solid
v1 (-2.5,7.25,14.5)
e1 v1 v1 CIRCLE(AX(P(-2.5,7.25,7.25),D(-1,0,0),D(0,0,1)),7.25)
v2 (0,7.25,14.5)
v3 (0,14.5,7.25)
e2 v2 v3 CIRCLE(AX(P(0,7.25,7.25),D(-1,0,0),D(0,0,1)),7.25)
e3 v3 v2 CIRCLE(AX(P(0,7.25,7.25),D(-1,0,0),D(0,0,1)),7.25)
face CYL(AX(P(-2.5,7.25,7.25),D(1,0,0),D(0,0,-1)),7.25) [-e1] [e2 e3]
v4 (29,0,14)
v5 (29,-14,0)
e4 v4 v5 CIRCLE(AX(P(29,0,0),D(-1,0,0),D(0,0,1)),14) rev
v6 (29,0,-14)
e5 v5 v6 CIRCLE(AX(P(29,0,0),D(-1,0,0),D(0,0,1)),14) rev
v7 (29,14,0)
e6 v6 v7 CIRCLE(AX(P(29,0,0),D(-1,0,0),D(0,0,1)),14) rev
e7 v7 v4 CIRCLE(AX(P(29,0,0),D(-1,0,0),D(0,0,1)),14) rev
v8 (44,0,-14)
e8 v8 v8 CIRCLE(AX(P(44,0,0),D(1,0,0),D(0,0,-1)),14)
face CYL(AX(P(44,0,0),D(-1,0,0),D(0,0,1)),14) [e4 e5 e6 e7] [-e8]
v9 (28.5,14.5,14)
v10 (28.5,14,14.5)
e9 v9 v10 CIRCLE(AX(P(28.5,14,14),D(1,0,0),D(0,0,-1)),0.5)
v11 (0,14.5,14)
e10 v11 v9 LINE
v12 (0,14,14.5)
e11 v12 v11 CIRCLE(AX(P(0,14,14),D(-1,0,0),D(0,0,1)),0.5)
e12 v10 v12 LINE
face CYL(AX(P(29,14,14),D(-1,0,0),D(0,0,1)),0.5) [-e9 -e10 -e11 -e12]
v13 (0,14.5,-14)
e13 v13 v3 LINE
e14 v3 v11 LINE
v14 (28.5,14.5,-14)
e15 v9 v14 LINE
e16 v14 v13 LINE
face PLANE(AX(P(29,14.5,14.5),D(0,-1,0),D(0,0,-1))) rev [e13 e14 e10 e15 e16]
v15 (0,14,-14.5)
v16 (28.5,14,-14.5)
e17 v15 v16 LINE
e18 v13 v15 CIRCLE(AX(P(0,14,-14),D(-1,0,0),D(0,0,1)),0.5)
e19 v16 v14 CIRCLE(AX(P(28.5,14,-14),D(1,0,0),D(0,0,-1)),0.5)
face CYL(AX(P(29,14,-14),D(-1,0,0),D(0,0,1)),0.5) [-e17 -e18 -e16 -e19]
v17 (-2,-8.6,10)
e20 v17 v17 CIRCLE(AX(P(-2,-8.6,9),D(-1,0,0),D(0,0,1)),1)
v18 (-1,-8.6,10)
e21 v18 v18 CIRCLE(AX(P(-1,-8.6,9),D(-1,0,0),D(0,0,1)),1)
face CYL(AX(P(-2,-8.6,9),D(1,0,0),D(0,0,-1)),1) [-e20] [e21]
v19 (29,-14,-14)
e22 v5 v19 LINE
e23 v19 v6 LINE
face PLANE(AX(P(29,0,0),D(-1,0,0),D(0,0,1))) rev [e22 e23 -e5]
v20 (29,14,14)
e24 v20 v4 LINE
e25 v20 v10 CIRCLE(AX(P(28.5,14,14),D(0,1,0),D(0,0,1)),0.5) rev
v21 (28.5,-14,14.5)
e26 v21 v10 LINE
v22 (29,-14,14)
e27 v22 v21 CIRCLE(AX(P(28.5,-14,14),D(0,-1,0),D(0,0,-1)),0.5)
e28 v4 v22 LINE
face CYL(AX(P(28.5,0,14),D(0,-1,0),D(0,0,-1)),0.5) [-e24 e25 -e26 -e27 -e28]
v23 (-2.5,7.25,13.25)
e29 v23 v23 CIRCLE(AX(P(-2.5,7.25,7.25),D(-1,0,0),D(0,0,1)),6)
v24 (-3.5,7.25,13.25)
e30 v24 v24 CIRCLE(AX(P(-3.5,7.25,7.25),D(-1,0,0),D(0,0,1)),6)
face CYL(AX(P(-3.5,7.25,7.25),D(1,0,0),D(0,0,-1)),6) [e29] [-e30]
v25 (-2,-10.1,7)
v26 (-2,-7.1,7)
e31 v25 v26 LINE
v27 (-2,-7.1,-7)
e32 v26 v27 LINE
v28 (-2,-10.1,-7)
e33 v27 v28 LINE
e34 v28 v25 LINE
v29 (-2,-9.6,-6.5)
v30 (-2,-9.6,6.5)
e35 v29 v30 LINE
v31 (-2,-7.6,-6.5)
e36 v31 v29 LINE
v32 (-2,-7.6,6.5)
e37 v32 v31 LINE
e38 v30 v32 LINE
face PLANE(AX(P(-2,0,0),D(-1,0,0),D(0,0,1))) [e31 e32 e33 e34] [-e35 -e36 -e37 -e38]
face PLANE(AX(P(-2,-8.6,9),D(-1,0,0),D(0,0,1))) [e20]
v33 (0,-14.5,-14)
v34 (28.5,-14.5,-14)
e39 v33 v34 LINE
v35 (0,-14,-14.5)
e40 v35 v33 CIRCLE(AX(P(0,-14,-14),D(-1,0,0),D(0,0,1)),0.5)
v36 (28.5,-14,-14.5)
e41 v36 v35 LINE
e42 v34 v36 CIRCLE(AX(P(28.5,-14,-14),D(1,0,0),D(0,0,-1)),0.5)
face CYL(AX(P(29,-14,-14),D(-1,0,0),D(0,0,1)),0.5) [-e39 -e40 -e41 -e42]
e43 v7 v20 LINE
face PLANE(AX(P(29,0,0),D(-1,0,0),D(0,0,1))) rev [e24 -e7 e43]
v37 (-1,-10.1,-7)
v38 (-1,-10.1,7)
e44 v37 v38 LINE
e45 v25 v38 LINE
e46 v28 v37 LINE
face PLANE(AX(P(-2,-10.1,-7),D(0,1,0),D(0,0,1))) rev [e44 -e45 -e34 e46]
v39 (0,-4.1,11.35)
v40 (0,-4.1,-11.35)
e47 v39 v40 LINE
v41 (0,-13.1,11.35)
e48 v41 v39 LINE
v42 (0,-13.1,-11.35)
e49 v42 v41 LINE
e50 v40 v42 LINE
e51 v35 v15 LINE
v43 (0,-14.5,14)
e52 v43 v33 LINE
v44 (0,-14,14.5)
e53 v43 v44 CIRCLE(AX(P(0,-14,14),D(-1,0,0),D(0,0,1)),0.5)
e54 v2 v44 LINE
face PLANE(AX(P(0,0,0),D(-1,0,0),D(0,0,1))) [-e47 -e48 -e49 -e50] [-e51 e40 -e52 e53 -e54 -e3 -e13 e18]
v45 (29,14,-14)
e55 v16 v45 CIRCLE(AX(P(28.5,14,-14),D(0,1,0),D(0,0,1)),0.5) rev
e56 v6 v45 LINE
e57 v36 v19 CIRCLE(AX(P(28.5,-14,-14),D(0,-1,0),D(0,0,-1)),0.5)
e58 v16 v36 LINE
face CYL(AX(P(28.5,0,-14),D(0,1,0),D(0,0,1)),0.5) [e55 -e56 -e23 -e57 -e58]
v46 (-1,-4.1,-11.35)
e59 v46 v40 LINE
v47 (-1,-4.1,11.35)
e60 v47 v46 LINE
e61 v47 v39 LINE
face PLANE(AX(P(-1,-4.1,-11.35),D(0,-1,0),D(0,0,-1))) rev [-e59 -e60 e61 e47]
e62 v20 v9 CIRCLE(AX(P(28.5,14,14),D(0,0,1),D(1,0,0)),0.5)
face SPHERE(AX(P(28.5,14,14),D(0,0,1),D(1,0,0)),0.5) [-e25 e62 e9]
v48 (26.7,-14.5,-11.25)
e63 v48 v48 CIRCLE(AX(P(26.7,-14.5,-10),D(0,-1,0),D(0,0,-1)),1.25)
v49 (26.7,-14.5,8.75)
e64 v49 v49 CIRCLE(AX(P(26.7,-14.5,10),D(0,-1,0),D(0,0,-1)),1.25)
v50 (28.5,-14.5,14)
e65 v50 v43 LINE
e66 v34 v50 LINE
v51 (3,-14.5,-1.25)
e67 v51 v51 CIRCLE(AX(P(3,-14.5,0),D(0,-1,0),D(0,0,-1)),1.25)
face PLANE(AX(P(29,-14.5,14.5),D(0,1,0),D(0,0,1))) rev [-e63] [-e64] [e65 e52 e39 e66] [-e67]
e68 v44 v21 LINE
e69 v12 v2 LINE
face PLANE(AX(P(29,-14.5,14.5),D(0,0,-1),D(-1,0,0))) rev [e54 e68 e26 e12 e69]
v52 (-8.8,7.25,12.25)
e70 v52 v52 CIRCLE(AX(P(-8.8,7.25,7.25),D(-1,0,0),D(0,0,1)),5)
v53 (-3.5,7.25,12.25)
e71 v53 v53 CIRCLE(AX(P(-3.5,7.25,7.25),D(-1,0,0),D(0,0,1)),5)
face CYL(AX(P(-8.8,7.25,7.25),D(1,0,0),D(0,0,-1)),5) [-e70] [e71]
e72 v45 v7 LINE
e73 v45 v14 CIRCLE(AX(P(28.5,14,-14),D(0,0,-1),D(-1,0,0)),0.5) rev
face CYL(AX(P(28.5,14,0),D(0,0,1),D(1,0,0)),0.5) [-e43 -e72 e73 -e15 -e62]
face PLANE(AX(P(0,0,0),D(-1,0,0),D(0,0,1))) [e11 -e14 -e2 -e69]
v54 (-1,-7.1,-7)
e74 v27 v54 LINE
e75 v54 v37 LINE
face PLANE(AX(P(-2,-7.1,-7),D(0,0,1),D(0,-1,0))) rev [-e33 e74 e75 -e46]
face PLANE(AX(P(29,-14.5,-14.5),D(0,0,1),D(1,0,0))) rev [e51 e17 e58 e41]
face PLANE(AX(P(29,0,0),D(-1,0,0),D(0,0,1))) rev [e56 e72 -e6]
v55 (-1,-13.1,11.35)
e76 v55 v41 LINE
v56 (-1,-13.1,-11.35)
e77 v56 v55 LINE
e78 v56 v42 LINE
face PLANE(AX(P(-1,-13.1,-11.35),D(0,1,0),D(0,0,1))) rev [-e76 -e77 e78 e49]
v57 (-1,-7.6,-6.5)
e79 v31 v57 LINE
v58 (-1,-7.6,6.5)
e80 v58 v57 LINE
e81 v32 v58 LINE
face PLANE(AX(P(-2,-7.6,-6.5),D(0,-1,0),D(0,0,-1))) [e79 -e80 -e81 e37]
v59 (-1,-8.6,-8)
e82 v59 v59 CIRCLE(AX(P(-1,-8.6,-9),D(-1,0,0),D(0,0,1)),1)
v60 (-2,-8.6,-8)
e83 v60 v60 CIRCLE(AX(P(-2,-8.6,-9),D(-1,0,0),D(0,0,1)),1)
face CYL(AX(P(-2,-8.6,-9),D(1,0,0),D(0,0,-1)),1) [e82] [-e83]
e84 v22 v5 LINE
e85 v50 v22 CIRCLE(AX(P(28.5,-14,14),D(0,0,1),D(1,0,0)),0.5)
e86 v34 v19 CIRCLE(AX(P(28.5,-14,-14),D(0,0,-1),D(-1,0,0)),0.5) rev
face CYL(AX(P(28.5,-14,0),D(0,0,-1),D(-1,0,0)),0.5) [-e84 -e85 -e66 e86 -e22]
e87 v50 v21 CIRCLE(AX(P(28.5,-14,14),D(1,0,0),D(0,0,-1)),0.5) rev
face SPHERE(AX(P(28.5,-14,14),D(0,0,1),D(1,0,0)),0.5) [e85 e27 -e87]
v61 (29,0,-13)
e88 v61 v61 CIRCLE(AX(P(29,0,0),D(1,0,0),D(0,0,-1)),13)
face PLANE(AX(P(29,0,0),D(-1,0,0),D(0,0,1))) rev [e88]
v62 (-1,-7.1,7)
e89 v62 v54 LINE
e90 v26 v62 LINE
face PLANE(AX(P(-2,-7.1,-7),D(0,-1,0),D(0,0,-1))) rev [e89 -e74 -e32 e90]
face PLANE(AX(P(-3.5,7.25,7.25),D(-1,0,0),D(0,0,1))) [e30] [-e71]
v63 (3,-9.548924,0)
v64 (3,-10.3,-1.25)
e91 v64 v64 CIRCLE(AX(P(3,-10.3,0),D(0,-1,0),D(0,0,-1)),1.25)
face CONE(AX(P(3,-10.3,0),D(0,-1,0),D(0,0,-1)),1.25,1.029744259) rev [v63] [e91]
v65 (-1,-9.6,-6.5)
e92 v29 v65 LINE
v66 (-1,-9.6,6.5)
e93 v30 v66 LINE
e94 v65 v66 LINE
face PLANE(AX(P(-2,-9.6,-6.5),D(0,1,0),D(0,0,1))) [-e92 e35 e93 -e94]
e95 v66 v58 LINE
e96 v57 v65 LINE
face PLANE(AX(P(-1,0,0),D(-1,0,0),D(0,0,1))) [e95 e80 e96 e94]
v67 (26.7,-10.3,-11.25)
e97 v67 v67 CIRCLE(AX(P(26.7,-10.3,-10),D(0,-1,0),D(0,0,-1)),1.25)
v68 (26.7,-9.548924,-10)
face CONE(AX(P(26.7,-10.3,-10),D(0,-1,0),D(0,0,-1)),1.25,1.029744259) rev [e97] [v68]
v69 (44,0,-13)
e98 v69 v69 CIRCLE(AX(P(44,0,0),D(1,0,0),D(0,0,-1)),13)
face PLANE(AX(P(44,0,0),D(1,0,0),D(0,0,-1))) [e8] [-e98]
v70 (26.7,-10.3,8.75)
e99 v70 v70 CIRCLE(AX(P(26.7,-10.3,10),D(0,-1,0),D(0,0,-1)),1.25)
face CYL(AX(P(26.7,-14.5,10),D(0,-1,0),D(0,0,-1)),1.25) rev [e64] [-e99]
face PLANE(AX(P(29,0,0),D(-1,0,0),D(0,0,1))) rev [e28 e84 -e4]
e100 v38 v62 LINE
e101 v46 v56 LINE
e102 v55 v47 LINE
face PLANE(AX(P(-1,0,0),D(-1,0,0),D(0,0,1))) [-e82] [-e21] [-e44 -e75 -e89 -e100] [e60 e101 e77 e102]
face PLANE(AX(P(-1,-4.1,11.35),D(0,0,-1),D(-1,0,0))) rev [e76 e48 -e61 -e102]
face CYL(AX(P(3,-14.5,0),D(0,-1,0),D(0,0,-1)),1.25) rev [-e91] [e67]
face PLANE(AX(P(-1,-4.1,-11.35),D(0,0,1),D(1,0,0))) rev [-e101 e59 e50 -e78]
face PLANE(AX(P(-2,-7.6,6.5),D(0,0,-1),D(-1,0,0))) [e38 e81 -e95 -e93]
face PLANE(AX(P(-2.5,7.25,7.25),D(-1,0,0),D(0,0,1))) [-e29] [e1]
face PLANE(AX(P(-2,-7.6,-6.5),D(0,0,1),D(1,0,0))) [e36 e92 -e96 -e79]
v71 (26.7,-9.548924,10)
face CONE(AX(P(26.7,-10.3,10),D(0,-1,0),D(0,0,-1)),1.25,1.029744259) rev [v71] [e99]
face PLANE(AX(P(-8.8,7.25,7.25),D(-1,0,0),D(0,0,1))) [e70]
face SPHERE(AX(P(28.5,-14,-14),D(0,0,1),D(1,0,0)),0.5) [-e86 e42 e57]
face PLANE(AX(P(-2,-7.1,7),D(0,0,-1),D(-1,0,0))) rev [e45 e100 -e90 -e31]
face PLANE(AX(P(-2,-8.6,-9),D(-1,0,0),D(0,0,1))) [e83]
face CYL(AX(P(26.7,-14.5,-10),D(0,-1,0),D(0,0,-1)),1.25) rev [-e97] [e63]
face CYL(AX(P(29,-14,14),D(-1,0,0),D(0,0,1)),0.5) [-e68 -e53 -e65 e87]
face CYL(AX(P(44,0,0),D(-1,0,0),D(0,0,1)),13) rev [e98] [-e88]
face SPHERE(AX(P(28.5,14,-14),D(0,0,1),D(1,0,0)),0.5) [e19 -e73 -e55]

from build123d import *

# Parameters (mm, degrees)
SKETCH_1_W             = 29
SKETCH_1_H             = 29
EXTRUDE_1_DEPTH        = 29
SKETCH_3_W             = 22.7
SKETCH_3_H             = 9
EXTRUDE_3_DEPTH        = 1
SKETCH_4_R             = 1
SKETCH_4_W             = 14
SKETCH_4_H             = 3
SKETCH_4_W_2           = 13
SKETCH_4_H_2           = 2
EXTRUDE_4_DEPTH        = 1
SKETCH_5_R             = 7.25
EXTRUDE_5_DEPTH        = 2.5
SKETCH_6_R             = 6
EXTRUDE_6_DEPTH        = 1
SKETCH_7_R             = 5
EXTRUDE_7_DEPTH        = 5.3
SKETCH_8_R             = 14
SKETCH_8_R_2           = 13
EXTRUDE_8_DEPTH        = 15
HOLE_WIZARD_M3_1_D     = 2.5
HOLE_WIZARD_M3_1_DEPTH = 4.2
HOLE_WIZARD_M3_1_TIP   = 0.751075774
FILLET_1_R             = 0.5


with BuildPart() as part:
    # 草图1 → 凸台-拉伸1 (new body)
    with BuildSketch(Plane(origin=(0, 0, 0), x_dir=(0, 0, -1), z_dir=(1, 0, 0))):
        Rectangle(SKETCH_1_W, SKETCH_1_H)
    extrude(amount=EXTRUDE_1_DEPTH)

    # 草图3 → 凸台-拉伸3 (add)
    with BuildSketch(Plane.ZY):
        with Locations((0, -8.6)):
            Rectangle(SKETCH_3_W, SKETCH_3_H)
    extrude(amount=EXTRUDE_3_DEPTH)

    # 草图4 → 凸台-拉伸4 (add)
    # profile 1 of 3: a face of its own
    with BuildSketch(Plane.ZY.offset(1)):
        with Locations((-9, -8.6)):
            Circle(SKETCH_4_R)
    # profile 2 of 3: a face of its own
    with BuildSketch(Plane.ZY.offset(1)):
        with Locations((9, -8.6)):
            Circle(SKETCH_4_R)
    # profile 3 of 3: a face of its own
    with BuildSketch(Plane.ZY.offset(1)):
        with Locations((0, -8.6)):
            Rectangle(SKETCH_4_W, SKETCH_4_H)
        with Locations((0, -8.6)):
            Rectangle(SKETCH_4_W_2, SKETCH_4_H_2, mode=Mode.SUBTRACT)
    extrude(amount=EXTRUDE_4_DEPTH)

    # 草图5 → 凸台-拉伸5 (add)
    with BuildSketch(Plane.ZY):
        with Locations((7.25, 7.25)):
            Circle(SKETCH_5_R)
    extrude(amount=EXTRUDE_5_DEPTH)

    # 草图6 → 凸台-拉伸6 (add)
    with BuildSketch(Plane.ZY.offset(2.5)):
        with Locations((7.25, 7.25)):
            Circle(SKETCH_6_R)
    extrude(amount=EXTRUDE_6_DEPTH)

    # 草图7 → 凸台-拉伸7 (add)
    with BuildSketch(Plane.ZY.offset(3.5)):
        with Locations((7.25, 7.25)):
            Circle(SKETCH_7_R)
    extrude(amount=EXTRUDE_7_DEPTH)

    # 草图8 → 凸台-拉伸8 (add)
    with BuildSketch(Plane(origin=(29, 0, 0), x_dir=(0, 0, -1), z_dir=(1, 0, 0))):
        with Locations(Location((0, 0, 0), (0, 0, 180))):
            Circle(SKETCH_8_R)
        Circle(SKETCH_8_R_2, mode=Mode.SUBTRACT)
    extrude(amount=EXTRUDE_8_DEPTH)

    # M3 螺纹孔1
    with Locations(Plane(origin=(0, -14.5, 0), x_dir=(-1, 0, 0), z_dir=(0, -1, 0))):
        with Locations((-26.7, 10), (-26.7, -10), (-3, 0)):
            Hole(HOLE_WIZARD_M3_1_D / 2, depth=HOLE_WIZARD_M3_1_DEPTH)
            with Locations((0, 0, -(HOLE_WIZARD_M3_1_DEPTH + HOLE_WIZARD_M3_1_TIP / 2))):  # 118° drill point
                Cone(0, HOLE_WIZARD_M3_1_D / 2, HOLE_WIZARD_M3_1_TIP, mode=Mode.SUBTRACT)

    # 圆角1
    fillet_1_edges = [part.edges().sort_by_distance(p)[0] for p in [
        (29, 0, 14.5),
        (29, -14.5, 0),
        (29, 0, -14.5),
        (29, 14.5, 0),
        (14.5, -14.5, -14.5),
        (14.5, -14.5, 14.5),
        (14.5, 14.5, 14.5),
        (14.5, 14.5, -14.5),
    ]]
    fillet(fillet_1_edges, radius=FILLET_1_R - 0.0001)  # a hair under: the kernel refuses the full size


solid = part.part
